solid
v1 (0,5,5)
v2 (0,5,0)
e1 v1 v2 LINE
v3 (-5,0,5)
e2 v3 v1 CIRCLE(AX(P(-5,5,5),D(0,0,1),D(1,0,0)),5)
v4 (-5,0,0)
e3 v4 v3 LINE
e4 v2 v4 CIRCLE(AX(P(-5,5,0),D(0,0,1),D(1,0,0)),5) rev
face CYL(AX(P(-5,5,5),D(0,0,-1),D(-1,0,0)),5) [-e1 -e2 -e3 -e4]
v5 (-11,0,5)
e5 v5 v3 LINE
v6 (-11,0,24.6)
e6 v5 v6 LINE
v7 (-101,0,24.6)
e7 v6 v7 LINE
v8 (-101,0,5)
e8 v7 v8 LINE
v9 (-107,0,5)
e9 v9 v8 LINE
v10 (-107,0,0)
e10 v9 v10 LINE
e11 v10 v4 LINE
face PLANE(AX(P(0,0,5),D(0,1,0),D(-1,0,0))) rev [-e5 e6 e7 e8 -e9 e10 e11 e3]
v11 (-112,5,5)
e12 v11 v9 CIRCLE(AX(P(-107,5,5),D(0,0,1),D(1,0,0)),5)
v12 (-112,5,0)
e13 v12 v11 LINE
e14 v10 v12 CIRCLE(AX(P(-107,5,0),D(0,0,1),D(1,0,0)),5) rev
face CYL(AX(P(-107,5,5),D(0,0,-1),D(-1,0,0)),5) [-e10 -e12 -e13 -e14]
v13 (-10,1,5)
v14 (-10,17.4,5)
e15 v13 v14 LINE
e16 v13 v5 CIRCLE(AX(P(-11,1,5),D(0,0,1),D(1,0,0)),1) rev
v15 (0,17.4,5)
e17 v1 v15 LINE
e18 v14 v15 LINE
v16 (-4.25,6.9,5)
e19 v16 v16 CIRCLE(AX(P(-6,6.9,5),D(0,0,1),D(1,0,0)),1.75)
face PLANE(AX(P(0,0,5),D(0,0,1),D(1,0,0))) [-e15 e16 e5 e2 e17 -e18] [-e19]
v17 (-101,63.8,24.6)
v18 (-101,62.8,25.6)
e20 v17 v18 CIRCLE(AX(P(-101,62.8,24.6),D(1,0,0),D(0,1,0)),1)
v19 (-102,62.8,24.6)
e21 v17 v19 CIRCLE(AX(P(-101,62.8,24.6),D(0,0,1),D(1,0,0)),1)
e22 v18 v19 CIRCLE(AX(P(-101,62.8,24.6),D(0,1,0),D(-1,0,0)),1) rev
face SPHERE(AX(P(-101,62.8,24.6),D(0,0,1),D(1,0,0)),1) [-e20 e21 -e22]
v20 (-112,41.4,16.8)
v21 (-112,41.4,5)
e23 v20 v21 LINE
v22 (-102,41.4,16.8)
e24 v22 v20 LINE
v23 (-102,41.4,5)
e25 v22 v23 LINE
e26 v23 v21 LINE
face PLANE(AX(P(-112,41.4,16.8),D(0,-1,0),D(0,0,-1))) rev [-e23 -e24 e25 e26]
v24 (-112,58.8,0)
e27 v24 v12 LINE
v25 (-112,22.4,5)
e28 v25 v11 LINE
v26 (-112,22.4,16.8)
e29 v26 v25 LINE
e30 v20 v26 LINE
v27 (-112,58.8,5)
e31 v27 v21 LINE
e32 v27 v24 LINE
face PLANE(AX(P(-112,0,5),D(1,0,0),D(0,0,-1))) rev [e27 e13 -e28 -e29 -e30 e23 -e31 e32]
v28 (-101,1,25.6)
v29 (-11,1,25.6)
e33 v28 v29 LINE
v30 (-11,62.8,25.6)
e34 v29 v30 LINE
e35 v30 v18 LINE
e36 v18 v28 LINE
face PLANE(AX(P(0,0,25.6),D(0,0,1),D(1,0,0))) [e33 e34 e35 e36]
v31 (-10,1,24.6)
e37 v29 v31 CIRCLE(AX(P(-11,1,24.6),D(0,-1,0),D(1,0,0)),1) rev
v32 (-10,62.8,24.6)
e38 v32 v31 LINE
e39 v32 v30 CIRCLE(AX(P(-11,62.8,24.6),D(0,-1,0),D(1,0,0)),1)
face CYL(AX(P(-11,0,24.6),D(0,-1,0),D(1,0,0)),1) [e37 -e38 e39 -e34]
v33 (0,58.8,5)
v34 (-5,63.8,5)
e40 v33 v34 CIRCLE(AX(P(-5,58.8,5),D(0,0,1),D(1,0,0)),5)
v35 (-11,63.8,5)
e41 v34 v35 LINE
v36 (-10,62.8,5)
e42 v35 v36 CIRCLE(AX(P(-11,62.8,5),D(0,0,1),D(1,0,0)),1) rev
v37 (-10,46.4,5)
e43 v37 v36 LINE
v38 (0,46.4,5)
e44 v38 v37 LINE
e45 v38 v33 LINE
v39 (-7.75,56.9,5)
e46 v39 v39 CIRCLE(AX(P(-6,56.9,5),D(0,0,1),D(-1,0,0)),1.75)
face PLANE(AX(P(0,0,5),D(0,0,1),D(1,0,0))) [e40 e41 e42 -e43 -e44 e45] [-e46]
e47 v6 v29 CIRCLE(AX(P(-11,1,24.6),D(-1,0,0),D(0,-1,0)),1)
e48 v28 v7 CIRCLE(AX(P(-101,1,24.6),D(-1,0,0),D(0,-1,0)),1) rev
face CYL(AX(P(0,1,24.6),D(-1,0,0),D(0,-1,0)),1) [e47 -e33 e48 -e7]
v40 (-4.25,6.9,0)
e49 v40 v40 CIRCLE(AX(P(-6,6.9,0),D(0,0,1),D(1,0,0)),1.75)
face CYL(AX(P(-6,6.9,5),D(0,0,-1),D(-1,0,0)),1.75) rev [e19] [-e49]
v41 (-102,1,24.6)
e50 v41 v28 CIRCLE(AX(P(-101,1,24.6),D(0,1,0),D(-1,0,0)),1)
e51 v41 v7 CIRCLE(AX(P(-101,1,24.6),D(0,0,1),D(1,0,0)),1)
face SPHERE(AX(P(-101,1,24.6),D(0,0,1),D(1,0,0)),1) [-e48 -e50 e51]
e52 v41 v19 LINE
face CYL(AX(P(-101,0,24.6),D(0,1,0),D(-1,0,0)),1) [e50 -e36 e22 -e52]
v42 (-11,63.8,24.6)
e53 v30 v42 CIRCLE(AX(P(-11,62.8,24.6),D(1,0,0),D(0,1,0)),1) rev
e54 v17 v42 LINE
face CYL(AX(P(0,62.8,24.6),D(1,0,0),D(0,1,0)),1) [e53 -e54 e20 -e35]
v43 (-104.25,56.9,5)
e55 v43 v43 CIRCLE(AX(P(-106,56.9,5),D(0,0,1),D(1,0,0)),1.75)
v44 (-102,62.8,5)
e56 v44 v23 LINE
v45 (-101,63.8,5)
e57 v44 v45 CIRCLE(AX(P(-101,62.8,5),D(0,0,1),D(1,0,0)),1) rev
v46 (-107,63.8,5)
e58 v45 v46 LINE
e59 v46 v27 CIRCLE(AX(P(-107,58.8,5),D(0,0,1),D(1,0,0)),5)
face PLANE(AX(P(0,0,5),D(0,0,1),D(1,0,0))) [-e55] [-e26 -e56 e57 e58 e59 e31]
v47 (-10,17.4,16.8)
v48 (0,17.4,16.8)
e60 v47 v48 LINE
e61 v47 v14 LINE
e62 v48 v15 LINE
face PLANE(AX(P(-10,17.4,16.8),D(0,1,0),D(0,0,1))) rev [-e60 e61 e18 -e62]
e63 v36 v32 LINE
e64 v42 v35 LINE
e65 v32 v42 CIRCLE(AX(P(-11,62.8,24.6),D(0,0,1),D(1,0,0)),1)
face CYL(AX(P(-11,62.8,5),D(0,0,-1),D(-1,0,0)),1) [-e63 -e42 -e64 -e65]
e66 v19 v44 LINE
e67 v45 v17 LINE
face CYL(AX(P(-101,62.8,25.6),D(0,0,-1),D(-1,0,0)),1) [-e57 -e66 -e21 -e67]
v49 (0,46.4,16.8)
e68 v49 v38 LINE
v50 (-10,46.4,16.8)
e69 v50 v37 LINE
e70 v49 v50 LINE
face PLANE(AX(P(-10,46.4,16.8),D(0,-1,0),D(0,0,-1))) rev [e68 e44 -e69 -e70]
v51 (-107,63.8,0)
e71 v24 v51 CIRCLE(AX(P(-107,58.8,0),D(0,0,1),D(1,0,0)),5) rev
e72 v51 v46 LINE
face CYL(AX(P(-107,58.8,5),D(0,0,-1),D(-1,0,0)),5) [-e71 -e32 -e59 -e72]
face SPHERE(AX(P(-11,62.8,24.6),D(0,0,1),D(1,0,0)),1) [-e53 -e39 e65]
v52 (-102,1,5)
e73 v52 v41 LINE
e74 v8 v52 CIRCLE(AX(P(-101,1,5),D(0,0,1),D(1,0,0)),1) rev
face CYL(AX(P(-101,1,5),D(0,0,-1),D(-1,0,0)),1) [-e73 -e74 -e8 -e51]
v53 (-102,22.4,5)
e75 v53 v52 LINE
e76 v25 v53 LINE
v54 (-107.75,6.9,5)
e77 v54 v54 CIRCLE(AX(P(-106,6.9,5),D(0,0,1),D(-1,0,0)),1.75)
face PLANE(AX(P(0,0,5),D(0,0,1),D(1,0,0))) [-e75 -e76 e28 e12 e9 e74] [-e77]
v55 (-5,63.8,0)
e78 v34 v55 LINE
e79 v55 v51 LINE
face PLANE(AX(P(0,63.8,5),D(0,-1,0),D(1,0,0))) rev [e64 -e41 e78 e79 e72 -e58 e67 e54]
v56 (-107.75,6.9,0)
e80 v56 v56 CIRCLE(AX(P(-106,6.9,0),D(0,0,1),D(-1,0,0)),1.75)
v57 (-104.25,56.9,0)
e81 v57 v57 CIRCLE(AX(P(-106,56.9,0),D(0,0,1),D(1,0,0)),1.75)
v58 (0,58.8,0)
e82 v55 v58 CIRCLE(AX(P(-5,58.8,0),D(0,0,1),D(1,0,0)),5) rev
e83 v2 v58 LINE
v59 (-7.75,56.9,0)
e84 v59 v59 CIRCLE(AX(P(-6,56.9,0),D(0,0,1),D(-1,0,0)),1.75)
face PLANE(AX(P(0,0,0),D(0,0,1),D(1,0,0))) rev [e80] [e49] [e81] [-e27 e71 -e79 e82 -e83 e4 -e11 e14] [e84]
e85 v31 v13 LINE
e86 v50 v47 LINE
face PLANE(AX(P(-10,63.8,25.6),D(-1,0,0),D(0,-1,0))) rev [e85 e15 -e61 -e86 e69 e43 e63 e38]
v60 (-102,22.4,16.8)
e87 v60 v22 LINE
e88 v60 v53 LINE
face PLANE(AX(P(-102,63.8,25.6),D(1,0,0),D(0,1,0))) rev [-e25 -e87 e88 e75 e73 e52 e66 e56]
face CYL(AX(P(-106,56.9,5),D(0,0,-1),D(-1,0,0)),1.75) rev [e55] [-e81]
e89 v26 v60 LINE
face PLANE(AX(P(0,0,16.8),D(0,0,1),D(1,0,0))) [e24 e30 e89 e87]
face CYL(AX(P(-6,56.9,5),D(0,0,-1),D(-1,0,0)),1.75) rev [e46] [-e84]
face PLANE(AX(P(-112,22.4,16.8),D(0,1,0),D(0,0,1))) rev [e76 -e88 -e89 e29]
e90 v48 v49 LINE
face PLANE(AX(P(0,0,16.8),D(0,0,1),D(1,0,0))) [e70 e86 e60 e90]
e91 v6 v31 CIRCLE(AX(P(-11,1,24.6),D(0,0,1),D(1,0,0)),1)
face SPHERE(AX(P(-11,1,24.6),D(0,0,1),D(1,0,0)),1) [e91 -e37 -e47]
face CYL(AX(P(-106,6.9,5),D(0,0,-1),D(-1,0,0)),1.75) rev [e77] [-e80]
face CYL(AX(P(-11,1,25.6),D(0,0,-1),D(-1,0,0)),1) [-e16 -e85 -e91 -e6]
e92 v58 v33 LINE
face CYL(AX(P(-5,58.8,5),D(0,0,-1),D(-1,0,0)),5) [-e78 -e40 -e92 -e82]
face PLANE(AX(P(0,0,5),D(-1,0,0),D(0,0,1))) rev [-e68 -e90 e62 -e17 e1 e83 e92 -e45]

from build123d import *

# Parameters (mm, degrees)
SKETCH1_W           = 112
SKETCH1_H           = 63.8
SKETCH1_R           = 1.75
BOSS_EXTRUDE1_DEPTH = 5
SKETCH2_W           = 92
SKETCH2_H           = 63.8
BOSS_EXTRUDE2_DEPTH = 20.6
SKETCH3_W           = 10
SKETCH3_H           = 19
SKETCH3_H_2         = 29
BOSS_EXTRUDE3_DEPTH = 11.8
FILLET1_R           = 5
FILLET2_R           = 1
FILLET3_R           = 1


with BuildPart() as part:
    # Sketch1 → Boss-Extrude1 (new body)
    with BuildSketch(Plane.XY):
        with Locations((-56, 31.9)):
            Rectangle(SKETCH1_W, SKETCH1_H)
        with Locations((-106, 56.9)):
            Circle(SKETCH1_R, mode=Mode.SUBTRACT)
        with Locations(Location((-6, 56.9, 0), (0, 0, 180))):
            Circle(SKETCH1_R, mode=Mode.SUBTRACT)
        with Locations((-6, 6.9)):
            Circle(SKETCH1_R, mode=Mode.SUBTRACT)
        with Locations(Location((-106, 6.9, 0), (0, 0, 180))):
            Circle(SKETCH1_R, mode=Mode.SUBTRACT)
    extrude(amount=BOSS_EXTRUDE1_DEPTH)

    # Sketch2 → Boss-Extrude2 (add)
    with BuildSketch(Plane.XY.offset(5)):
        with Locations((-56, 31.9)):
            Rectangle(SKETCH2_W, SKETCH2_H)
    extrude(amount=BOSS_EXTRUDE2_DEPTH)

    # Sketch3 → Boss-Extrude3 (add)
    with BuildSketch(Plane.XY.offset(5)):
        with Locations((-107, 31.9)):
            Rectangle(SKETCH3_W, SKETCH3_H)
        with Locations((-5, 31.9)):
            Rectangle(SKETCH3_W, SKETCH3_H_2)
    extrude(amount=BOSS_EXTRUDE3_DEPTH)

    # Fillet1
    fillet1_edges = [part.edges().sort_by_distance(p)[0] for p in [
        (0, 0, 2.5),
        (-112, 0, 2.5),
        (-112, 63.8, 2.5),
        (0, 63.8, 2.5),
    ]]
    fillet(fillet1_edges, radius=FILLET1_R)

    # Fillet2
    fillet2_edges = [part.edges().sort_by_distance(p)[0] for p in [
        (-102, 31.9, 25.6),
        (-56, 0, 25.6),
        (-10, 31.9, 25.6),
        (-56, 63.8, 25.6),
    ]]
    fillet(fillet2_edges, radius=FILLET2_R)

    # Fillet3
    # the kernel refuses this fillet: 1 mm, written as the material it takes off along each edge
    with BuildSketch(Plane(origin=(-11, 1, 24.6), x_dir=(1, 0, 0), z_dir=(0, -1, 0))) as fillet3_piece_1_section:
        Polygon((0, 0), (FILLET3_R, 0), (FILLET3_R, FILLET3_R), (0, FILLET3_R), align=None)
    fillet3_piece_1 = extrude(amount=FILLET3_R, mode=Mode.PRIVATE)
    fillet3_piece_1 = fillet3_piece_1 - Plane(origin=(-11, 1, 24.6), x_dir=(-0.7071067811865475, 0, -0.7071067811865475), z_dir=(0, -1, 0)) * Sphere(FILLET3_R, mode=Mode.PRIVATE)
    add(fillet3_piece_1, mode=Mode.SUBTRACT)
    with BuildSketch(Plane(origin=(-101, 1, 24.6), x_dir=(-1, 0, 0), z_dir=(0, -1, 0))) as fillet3_piece_2_section:
        Polygon((0, 0), (FILLET3_R, 0), (FILLET3_R, -FILLET3_R), (0, -FILLET3_R), align=None)
    fillet3_piece_2 = extrude(amount=FILLET3_R, mode=Mode.PRIVATE)
    fillet3_piece_2 = fillet3_piece_2 - Plane(origin=(-101, 1, 24.6), x_dir=(0.7071067811865475, 0, -0.7071067811865475), z_dir=(0, -1, 0)) * Sphere(FILLET3_R, mode=Mode.PRIVATE)
    add(fillet3_piece_2, mode=Mode.SUBTRACT)
    with BuildSketch(Plane(origin=(-11, 62.8, 24.6), x_dir=(0, 1, 0), z_dir=(1, 0, 0))) as fillet3_piece_3_section:
        Polygon((0, 0), (FILLET3_R, 0), (FILLET3_R, FILLET3_R), (0, FILLET3_R), align=None)
    fillet3_piece_3 = extrude(amount=FILLET3_R, mode=Mode.PRIVATE)
    fillet3_piece_3 = fillet3_piece_3 - Plane(origin=(-11, 62.8, 24.6), x_dir=(0, -0.7071067811865475, -0.7071067811865475), z_dir=(1, 0, 0)) * Sphere(FILLET3_R, mode=Mode.PRIVATE)
    add(fillet3_piece_3, mode=Mode.SUBTRACT)
    with BuildSketch(Plane(origin=(-101, 62.8, 24.6), x_dir=(0, 1, 0), z_dir=(-1, 0, 0))) as fillet3_piece_4_section:
        Polygon((0, 0), (FILLET3_R, 0), (FILLET3_R, -FILLET3_R), (0, -FILLET3_R), align=None)
    fillet3_piece_4 = extrude(amount=FILLET3_R, mode=Mode.PRIVATE)
    fillet3_piece_4 = fillet3_piece_4 - Plane(origin=(-101, 62.8, 24.6), x_dir=(0, -0.7071067811865475, -0.7071067811865475), z_dir=(-1, 0, 0)) * Sphere(FILLET3_R, mode=Mode.PRIVATE)
    add(fillet3_piece_4, mode=Mode.SUBTRACT)
    with BuildSketch(Plane(origin=(-102, 63.8, 5), x_dir=(0, -1, 0), z_dir=(0, 0, 1)), Plane(origin=(-102, 0, 5), x_dir=(1, 0, 0), z_dir=(0, 0, 1))) as fillet3_piece_5:
        with BuildLine():
            CenterArc((FILLET3_R, FILLET3_R), FILLET3_R, 180, 90)
            Line((0, FILLET3_R), (0, 0))
            Line((0, 0), (FILLET3_R, 0))
        make_face()
    extrude(amount=19.6, mode=Mode.SUBTRACT)
    with BuildSketch(Plane(origin=(-10, 63.8, 5), x_dir=(0, -1, 0), z_dir=(0, 0, 1)), Plane(origin=(-10, 0, 5), x_dir=(-1, 0, 0), z_dir=(0, 0, 1))) as fillet3_piece_6:
        with BuildLine():
            CenterArc((FILLET3_R, -FILLET3_R), FILLET3_R, 90, 90)
            Line((0, -FILLET3_R), (0, 0))
            Line((0, 0), (FILLET3_R, 0))
        make_face()
    extrude(amount=19.6, mode=Mode.SUBTRACT)


solid = part.part
